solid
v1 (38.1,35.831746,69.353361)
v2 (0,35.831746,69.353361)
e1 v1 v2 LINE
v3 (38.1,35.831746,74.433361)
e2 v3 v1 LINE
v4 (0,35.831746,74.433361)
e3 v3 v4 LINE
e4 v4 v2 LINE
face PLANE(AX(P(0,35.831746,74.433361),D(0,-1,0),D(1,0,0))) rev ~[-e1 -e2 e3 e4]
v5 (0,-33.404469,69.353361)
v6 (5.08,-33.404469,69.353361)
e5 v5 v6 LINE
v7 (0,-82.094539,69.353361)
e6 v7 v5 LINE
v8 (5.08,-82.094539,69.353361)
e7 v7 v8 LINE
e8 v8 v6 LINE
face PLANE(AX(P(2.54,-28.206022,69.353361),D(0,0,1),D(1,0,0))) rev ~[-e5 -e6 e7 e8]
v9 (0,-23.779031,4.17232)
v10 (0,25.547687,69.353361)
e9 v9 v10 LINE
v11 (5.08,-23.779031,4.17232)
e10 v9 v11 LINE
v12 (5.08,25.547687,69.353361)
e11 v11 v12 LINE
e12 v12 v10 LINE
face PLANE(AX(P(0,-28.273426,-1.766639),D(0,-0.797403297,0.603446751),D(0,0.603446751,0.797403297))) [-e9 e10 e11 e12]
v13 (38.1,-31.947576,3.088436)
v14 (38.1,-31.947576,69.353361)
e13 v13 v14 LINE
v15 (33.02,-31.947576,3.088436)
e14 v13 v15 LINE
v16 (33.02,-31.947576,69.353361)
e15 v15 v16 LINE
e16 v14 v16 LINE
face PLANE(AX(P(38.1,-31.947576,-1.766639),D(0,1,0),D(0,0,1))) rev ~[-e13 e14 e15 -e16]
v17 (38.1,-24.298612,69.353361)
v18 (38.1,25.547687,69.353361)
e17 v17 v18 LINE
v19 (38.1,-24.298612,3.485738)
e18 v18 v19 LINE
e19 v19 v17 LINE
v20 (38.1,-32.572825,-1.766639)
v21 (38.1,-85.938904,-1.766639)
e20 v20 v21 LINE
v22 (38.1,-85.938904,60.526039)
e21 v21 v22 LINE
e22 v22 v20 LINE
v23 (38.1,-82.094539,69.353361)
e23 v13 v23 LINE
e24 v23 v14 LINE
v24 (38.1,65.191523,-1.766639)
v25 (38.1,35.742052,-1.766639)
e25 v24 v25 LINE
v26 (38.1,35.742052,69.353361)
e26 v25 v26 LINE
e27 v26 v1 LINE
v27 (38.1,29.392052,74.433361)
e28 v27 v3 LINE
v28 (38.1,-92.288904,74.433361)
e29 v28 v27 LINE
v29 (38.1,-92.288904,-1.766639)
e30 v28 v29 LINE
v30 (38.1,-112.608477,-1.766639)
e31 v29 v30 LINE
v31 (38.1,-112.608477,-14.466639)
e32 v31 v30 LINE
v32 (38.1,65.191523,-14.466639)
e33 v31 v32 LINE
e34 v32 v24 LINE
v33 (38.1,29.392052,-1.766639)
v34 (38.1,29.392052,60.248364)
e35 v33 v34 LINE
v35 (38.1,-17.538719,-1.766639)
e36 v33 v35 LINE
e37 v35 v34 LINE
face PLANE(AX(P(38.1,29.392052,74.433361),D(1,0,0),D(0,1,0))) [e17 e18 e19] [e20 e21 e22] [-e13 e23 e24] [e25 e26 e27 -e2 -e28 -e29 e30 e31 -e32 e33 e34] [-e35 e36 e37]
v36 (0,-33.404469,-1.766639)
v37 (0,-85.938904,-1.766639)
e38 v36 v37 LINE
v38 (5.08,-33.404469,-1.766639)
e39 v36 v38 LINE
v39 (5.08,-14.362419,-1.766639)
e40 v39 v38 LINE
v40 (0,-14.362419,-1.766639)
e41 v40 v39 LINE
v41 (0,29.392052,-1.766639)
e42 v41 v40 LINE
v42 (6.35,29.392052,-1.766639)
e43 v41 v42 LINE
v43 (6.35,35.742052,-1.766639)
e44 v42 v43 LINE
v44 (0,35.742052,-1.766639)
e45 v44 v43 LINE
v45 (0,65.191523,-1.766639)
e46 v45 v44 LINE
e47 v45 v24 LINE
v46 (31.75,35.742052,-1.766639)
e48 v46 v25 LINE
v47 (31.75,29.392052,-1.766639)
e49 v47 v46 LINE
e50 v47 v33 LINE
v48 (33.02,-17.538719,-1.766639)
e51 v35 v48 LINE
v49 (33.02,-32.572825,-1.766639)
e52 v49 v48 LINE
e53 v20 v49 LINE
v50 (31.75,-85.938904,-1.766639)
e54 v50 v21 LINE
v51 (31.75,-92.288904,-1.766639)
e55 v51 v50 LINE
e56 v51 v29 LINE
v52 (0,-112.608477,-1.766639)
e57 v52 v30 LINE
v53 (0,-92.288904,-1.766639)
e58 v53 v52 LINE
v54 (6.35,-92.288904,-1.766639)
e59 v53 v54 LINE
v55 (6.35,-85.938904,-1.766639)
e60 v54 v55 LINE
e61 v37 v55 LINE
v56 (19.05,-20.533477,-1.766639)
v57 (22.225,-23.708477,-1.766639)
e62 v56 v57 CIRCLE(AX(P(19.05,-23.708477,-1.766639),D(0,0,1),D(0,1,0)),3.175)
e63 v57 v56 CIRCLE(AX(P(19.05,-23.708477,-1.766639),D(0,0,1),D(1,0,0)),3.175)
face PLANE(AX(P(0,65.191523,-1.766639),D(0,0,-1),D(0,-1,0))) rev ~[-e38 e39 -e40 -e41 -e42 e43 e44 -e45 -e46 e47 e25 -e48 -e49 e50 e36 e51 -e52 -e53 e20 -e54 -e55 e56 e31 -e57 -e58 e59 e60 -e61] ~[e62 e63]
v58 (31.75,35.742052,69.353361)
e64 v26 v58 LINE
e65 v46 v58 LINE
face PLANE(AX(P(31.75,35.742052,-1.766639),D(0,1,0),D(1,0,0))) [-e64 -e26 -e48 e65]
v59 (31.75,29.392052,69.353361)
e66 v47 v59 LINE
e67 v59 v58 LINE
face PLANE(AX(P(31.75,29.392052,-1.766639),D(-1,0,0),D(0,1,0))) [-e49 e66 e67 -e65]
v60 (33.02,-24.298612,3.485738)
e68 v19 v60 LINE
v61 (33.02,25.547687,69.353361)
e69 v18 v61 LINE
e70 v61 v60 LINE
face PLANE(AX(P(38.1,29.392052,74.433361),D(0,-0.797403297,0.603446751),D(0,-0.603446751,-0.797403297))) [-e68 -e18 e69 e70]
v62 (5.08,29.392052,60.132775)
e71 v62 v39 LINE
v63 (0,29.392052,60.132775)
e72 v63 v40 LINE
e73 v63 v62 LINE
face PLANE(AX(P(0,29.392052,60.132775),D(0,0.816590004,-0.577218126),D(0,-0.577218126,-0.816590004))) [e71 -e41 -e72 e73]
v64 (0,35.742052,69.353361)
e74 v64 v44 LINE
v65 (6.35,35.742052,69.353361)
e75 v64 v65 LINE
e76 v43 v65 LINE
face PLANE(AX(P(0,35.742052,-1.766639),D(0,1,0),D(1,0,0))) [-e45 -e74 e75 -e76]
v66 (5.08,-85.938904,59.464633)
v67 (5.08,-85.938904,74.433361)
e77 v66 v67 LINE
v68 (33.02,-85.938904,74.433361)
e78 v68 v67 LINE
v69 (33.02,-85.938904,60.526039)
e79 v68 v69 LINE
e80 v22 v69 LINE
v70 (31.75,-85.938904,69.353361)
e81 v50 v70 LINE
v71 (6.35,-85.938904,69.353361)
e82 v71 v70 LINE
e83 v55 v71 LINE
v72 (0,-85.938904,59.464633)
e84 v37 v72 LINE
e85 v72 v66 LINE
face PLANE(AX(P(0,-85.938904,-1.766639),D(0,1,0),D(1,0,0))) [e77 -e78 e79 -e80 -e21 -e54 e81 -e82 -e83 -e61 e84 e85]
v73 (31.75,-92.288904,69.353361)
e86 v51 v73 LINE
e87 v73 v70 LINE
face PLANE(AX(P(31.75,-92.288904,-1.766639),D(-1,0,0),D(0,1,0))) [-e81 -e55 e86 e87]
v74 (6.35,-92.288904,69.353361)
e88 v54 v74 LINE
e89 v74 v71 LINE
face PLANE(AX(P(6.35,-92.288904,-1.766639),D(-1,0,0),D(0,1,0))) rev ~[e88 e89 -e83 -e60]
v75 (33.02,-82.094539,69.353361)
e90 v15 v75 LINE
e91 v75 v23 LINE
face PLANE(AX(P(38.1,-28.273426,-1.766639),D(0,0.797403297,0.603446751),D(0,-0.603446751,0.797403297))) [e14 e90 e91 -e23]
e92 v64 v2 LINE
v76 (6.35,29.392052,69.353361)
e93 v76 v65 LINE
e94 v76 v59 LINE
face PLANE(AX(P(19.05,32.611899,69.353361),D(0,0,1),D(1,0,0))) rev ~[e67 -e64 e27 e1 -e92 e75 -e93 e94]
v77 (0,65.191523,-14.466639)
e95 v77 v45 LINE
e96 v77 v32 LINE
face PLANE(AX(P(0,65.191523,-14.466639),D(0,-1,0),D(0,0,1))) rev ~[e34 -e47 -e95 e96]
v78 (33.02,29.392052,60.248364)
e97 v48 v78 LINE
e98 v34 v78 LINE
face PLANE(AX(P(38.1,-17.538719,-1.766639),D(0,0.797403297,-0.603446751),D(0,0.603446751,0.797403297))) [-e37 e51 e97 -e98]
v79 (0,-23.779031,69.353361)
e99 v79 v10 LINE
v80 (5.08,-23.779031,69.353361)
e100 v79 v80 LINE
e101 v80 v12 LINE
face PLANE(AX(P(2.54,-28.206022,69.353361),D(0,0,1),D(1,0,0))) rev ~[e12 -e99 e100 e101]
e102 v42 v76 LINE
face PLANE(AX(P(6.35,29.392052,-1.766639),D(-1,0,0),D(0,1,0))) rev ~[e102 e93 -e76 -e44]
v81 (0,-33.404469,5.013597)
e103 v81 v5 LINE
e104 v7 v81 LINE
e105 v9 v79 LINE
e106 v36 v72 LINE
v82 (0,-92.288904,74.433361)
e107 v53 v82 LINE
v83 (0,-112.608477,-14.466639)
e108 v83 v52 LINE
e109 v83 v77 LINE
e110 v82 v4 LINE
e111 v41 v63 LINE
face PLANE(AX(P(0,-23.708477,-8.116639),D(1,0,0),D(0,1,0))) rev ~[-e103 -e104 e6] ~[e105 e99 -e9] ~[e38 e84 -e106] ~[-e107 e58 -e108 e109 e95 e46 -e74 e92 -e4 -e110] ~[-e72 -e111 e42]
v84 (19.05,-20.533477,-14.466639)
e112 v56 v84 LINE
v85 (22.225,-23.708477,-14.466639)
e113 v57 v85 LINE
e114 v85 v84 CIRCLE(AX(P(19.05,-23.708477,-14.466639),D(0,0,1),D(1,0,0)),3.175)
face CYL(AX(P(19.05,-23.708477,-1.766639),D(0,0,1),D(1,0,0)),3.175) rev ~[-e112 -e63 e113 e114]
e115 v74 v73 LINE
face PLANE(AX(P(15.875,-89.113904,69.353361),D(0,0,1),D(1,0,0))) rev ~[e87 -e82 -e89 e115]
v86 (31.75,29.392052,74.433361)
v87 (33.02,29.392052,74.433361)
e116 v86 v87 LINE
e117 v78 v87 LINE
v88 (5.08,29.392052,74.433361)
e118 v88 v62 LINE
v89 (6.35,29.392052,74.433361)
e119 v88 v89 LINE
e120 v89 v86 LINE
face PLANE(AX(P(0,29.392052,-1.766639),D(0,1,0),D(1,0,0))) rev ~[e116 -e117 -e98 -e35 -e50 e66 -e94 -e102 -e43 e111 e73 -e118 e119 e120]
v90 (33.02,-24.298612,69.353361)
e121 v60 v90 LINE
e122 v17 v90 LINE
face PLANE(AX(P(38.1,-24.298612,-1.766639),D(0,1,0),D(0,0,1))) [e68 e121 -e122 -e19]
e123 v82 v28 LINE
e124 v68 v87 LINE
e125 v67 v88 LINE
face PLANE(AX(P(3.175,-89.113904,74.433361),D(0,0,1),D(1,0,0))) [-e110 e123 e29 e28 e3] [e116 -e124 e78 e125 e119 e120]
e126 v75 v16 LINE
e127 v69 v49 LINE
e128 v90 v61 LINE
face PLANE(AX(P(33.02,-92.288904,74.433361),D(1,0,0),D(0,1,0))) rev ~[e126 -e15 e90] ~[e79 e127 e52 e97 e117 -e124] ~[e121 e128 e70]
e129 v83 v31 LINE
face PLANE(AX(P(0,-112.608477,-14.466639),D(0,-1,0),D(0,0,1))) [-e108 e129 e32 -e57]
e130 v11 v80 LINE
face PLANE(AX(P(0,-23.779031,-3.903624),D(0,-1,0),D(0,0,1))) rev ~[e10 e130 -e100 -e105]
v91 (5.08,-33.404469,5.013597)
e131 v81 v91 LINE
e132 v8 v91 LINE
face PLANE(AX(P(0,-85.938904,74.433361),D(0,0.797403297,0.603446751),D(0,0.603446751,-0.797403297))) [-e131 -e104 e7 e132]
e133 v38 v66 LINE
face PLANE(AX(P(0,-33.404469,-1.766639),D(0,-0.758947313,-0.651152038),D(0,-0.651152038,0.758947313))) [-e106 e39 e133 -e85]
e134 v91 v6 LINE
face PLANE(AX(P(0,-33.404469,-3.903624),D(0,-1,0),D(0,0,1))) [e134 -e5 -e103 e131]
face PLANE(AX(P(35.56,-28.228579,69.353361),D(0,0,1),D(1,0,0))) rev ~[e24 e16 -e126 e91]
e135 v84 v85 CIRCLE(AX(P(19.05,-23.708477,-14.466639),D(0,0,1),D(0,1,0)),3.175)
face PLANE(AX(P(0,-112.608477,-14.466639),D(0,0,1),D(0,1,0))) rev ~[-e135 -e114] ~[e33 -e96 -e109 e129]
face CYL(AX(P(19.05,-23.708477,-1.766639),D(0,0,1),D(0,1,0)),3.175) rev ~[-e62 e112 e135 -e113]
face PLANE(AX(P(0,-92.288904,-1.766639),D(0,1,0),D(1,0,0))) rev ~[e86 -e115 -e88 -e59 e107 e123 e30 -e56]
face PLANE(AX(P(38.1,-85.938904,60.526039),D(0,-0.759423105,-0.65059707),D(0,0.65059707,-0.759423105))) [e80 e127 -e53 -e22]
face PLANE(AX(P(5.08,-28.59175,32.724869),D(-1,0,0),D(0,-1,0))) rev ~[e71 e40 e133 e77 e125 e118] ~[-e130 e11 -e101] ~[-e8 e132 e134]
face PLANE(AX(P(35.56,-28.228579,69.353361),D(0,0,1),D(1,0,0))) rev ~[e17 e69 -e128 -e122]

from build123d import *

# Parameters (mm, degrees)
F0_W      = 127
F0_H      = 12.7
F0_W_2    = 25.4
F1_DEPTH  = 38.1
F2_W      = 6.35
F2_H      = 6.35
F3_DEPTH  = 76.2
F4_W      = 6.35
F4_H      = 14.1849974977
F4_H_2    = 13.9073220724
F5_DEPTH  = 5.08
F7_DEPTH  = 5.08
F9_DEPTH  = 119.634
F10_W     = 31.75
F10_H     = 6.35
F11_DEPTH = 5.08
F12_W     = 38.1
F12_H     = 6.4396932721
F13_DEPTH = 5.08
F14_W     = 5.08
F14_H     = 128.0755363405
F15_DEPTH = 5.08
F16_W     = 5.08
F16_H     = 128.120649606
F17_DEPTH = 5.08
F18_W     = 7.6489634812
F18_H     = 71.12
F19_DEPTH = 5.08
F20_W     = 9.6254386008
F20_H     = 73.2569846961
F21_DEPTH = 5.08


# Not quite as in the source:
# - a feature names something its author has since deleted; it is built from what else it names


with BuildPart() as f1:
    # F0 (on Right) → F1 (new body)
    with BuildSketch(Plane.YZ):
        with Locations((-23.7084774733, -8.1166389743)):
            Rectangle(F0_W, F0_H)
        with Locations((-99.9084774733, -8.1166389743)):
            Rectangle(F0_W_2, F0_H)
        with Locations((52.4915225267, -8.1166389743)):
            Rectangle(F0_W_2, F0_H)
    extrude(amount=F1_DEPTH)

    # F2 (on face) → F3 (join)
    with BuildSketch(Plane.XY.offset(-1.7666389743)):
        with Locations((3.175, 32.5670524418)):
            Rectangle(F2_W, F2_H)
        with Locations((34.925, 32.5670524418)):
            Rectangle(F2_W, F2_H)
        with Locations((3.175, -89.113903892)):
            Rectangle(F2_W, F2_H)
        with Locations((34.925, -89.113903892)):
            Rectangle(F2_W, F2_H)
    extrude(amount=F3_DEPTH)

    # F4 (on face) → F5 (join)
    with BuildSketch(Plane.YZ.offset(38.1)):
        with Locations((32.5670524418, 67.3408622769)):
            Rectangle(F4_W, F4_H)
        with Locations((-89.113903892, 67.4796999895)):
            Rectangle(F4_W, F4_H_2)
        Polygon((29.3920524418, 60.2483635281), (29.3920524418, 74.4333610257), (-28.2734257251, -1.7666389743), (-17.538718855, -1.7666389743), align=None)
        Polygon((-32.572824508, -1.7666389743), (-28.2734257251, -1.7666389743), (-85.938903892, 74.4333610257), (-85.938903892, 60.5260389533), align=None)
    extrude(amount=-F5_DEPTH)

    # F6 (on face) → F7 (join)
    with BuildSketch(Plane(origin=(0, 0, 0), x_dir=(0, -1, 0), z_dir=(-1, 0, 0))):
        Polygon((92.288903892, 59.4646334648), (92.288903892, 74.4333610257), (85.938903892, 74.4333610257), (28.2734257251, -1.7666389743), (33.4044694901, -1.7666389743), (85.938903892, 59.4646334648), align=None)
        Polygon((14.3624190241, -1.7666389743), (28.2734257251, -1.7666389743), (-29.3920524418, 74.4333610257), (-35.7420524418, 74.4333610257), (-35.7420524418, 60.1327754557), (-29.3920524418, 60.1327754557), align=None)
    extrude(amount=-F7_DEPTH)

    # F8 (on face) → F9 (cut)
    with BuildSketch(Plane.XY.offset(-1.7666389743)):
        with BuildLine():
            ThreePointArc((19.05, -20.5334774733), (16.8049359697, -25.9535415035), (22.225, -23.7084774733))
            ThreePointArc((22.225, -23.7084774733), (21.2950640303, -21.463413443), (19.05, -20.5334774733))
        make_face()
    extrude(amount=-F9_DEPTH, mode=Mode.SUBTRACT)

    # F10 (on face) → F11 (join)
    with BuildSketch(Plane.XY.offset(74.4333610257)):
        with Locations((15.875, -89.113903892)):
            Rectangle(F10_W, F10_H)
    extrude(amount=-F11_DEPTH)

    # F12 (on face) → F13 (join)
    with BuildSketch(Plane.XY.offset(74.4333610257)):
        with Locations((19.05, 32.6118990779)):
            Rectangle(F12_W, F12_H)
    extrude(amount=-F13_DEPTH)

    # F14 (on face) → F15 (join)
    with BuildSketch(Plane.XY.offset(74.4333610257)):
        with Locations((2.54, -28.2060224563)):
            Rectangle(F14_W, F14_H)
    extrude(amount=-F15_DEPTH)

    # F16 (on face) → F17 (join)
    with BuildSketch(Plane.XY.offset(74.4333610257)):
        with Locations((35.56, -28.228579089)):
            Rectangle(F16_W, F16_H)
    extrude(amount=-F17_DEPTH)

    # F18 (on face) → F19 (join)
    with BuildSketch(Plane.YZ.offset(38.1)):
        with Locations((-28.123093769, 33.7933610257)):
            Rectangle(F18_W, F18_H)
    extrude(amount=-F19_DEPTH)

    # F20 (on face) → F21 (join)
    with BuildSketch(Plane(origin=(0, 0, 0), x_dir=(0, -1, 0), z_dir=(-1, 0, 0))):
        with Locations((28.5917501897, 32.7248686777)):
            Rectangle(F20_W, F20_H)
    extrude(amount=-F21_DEPTH)


solid = f1.part
